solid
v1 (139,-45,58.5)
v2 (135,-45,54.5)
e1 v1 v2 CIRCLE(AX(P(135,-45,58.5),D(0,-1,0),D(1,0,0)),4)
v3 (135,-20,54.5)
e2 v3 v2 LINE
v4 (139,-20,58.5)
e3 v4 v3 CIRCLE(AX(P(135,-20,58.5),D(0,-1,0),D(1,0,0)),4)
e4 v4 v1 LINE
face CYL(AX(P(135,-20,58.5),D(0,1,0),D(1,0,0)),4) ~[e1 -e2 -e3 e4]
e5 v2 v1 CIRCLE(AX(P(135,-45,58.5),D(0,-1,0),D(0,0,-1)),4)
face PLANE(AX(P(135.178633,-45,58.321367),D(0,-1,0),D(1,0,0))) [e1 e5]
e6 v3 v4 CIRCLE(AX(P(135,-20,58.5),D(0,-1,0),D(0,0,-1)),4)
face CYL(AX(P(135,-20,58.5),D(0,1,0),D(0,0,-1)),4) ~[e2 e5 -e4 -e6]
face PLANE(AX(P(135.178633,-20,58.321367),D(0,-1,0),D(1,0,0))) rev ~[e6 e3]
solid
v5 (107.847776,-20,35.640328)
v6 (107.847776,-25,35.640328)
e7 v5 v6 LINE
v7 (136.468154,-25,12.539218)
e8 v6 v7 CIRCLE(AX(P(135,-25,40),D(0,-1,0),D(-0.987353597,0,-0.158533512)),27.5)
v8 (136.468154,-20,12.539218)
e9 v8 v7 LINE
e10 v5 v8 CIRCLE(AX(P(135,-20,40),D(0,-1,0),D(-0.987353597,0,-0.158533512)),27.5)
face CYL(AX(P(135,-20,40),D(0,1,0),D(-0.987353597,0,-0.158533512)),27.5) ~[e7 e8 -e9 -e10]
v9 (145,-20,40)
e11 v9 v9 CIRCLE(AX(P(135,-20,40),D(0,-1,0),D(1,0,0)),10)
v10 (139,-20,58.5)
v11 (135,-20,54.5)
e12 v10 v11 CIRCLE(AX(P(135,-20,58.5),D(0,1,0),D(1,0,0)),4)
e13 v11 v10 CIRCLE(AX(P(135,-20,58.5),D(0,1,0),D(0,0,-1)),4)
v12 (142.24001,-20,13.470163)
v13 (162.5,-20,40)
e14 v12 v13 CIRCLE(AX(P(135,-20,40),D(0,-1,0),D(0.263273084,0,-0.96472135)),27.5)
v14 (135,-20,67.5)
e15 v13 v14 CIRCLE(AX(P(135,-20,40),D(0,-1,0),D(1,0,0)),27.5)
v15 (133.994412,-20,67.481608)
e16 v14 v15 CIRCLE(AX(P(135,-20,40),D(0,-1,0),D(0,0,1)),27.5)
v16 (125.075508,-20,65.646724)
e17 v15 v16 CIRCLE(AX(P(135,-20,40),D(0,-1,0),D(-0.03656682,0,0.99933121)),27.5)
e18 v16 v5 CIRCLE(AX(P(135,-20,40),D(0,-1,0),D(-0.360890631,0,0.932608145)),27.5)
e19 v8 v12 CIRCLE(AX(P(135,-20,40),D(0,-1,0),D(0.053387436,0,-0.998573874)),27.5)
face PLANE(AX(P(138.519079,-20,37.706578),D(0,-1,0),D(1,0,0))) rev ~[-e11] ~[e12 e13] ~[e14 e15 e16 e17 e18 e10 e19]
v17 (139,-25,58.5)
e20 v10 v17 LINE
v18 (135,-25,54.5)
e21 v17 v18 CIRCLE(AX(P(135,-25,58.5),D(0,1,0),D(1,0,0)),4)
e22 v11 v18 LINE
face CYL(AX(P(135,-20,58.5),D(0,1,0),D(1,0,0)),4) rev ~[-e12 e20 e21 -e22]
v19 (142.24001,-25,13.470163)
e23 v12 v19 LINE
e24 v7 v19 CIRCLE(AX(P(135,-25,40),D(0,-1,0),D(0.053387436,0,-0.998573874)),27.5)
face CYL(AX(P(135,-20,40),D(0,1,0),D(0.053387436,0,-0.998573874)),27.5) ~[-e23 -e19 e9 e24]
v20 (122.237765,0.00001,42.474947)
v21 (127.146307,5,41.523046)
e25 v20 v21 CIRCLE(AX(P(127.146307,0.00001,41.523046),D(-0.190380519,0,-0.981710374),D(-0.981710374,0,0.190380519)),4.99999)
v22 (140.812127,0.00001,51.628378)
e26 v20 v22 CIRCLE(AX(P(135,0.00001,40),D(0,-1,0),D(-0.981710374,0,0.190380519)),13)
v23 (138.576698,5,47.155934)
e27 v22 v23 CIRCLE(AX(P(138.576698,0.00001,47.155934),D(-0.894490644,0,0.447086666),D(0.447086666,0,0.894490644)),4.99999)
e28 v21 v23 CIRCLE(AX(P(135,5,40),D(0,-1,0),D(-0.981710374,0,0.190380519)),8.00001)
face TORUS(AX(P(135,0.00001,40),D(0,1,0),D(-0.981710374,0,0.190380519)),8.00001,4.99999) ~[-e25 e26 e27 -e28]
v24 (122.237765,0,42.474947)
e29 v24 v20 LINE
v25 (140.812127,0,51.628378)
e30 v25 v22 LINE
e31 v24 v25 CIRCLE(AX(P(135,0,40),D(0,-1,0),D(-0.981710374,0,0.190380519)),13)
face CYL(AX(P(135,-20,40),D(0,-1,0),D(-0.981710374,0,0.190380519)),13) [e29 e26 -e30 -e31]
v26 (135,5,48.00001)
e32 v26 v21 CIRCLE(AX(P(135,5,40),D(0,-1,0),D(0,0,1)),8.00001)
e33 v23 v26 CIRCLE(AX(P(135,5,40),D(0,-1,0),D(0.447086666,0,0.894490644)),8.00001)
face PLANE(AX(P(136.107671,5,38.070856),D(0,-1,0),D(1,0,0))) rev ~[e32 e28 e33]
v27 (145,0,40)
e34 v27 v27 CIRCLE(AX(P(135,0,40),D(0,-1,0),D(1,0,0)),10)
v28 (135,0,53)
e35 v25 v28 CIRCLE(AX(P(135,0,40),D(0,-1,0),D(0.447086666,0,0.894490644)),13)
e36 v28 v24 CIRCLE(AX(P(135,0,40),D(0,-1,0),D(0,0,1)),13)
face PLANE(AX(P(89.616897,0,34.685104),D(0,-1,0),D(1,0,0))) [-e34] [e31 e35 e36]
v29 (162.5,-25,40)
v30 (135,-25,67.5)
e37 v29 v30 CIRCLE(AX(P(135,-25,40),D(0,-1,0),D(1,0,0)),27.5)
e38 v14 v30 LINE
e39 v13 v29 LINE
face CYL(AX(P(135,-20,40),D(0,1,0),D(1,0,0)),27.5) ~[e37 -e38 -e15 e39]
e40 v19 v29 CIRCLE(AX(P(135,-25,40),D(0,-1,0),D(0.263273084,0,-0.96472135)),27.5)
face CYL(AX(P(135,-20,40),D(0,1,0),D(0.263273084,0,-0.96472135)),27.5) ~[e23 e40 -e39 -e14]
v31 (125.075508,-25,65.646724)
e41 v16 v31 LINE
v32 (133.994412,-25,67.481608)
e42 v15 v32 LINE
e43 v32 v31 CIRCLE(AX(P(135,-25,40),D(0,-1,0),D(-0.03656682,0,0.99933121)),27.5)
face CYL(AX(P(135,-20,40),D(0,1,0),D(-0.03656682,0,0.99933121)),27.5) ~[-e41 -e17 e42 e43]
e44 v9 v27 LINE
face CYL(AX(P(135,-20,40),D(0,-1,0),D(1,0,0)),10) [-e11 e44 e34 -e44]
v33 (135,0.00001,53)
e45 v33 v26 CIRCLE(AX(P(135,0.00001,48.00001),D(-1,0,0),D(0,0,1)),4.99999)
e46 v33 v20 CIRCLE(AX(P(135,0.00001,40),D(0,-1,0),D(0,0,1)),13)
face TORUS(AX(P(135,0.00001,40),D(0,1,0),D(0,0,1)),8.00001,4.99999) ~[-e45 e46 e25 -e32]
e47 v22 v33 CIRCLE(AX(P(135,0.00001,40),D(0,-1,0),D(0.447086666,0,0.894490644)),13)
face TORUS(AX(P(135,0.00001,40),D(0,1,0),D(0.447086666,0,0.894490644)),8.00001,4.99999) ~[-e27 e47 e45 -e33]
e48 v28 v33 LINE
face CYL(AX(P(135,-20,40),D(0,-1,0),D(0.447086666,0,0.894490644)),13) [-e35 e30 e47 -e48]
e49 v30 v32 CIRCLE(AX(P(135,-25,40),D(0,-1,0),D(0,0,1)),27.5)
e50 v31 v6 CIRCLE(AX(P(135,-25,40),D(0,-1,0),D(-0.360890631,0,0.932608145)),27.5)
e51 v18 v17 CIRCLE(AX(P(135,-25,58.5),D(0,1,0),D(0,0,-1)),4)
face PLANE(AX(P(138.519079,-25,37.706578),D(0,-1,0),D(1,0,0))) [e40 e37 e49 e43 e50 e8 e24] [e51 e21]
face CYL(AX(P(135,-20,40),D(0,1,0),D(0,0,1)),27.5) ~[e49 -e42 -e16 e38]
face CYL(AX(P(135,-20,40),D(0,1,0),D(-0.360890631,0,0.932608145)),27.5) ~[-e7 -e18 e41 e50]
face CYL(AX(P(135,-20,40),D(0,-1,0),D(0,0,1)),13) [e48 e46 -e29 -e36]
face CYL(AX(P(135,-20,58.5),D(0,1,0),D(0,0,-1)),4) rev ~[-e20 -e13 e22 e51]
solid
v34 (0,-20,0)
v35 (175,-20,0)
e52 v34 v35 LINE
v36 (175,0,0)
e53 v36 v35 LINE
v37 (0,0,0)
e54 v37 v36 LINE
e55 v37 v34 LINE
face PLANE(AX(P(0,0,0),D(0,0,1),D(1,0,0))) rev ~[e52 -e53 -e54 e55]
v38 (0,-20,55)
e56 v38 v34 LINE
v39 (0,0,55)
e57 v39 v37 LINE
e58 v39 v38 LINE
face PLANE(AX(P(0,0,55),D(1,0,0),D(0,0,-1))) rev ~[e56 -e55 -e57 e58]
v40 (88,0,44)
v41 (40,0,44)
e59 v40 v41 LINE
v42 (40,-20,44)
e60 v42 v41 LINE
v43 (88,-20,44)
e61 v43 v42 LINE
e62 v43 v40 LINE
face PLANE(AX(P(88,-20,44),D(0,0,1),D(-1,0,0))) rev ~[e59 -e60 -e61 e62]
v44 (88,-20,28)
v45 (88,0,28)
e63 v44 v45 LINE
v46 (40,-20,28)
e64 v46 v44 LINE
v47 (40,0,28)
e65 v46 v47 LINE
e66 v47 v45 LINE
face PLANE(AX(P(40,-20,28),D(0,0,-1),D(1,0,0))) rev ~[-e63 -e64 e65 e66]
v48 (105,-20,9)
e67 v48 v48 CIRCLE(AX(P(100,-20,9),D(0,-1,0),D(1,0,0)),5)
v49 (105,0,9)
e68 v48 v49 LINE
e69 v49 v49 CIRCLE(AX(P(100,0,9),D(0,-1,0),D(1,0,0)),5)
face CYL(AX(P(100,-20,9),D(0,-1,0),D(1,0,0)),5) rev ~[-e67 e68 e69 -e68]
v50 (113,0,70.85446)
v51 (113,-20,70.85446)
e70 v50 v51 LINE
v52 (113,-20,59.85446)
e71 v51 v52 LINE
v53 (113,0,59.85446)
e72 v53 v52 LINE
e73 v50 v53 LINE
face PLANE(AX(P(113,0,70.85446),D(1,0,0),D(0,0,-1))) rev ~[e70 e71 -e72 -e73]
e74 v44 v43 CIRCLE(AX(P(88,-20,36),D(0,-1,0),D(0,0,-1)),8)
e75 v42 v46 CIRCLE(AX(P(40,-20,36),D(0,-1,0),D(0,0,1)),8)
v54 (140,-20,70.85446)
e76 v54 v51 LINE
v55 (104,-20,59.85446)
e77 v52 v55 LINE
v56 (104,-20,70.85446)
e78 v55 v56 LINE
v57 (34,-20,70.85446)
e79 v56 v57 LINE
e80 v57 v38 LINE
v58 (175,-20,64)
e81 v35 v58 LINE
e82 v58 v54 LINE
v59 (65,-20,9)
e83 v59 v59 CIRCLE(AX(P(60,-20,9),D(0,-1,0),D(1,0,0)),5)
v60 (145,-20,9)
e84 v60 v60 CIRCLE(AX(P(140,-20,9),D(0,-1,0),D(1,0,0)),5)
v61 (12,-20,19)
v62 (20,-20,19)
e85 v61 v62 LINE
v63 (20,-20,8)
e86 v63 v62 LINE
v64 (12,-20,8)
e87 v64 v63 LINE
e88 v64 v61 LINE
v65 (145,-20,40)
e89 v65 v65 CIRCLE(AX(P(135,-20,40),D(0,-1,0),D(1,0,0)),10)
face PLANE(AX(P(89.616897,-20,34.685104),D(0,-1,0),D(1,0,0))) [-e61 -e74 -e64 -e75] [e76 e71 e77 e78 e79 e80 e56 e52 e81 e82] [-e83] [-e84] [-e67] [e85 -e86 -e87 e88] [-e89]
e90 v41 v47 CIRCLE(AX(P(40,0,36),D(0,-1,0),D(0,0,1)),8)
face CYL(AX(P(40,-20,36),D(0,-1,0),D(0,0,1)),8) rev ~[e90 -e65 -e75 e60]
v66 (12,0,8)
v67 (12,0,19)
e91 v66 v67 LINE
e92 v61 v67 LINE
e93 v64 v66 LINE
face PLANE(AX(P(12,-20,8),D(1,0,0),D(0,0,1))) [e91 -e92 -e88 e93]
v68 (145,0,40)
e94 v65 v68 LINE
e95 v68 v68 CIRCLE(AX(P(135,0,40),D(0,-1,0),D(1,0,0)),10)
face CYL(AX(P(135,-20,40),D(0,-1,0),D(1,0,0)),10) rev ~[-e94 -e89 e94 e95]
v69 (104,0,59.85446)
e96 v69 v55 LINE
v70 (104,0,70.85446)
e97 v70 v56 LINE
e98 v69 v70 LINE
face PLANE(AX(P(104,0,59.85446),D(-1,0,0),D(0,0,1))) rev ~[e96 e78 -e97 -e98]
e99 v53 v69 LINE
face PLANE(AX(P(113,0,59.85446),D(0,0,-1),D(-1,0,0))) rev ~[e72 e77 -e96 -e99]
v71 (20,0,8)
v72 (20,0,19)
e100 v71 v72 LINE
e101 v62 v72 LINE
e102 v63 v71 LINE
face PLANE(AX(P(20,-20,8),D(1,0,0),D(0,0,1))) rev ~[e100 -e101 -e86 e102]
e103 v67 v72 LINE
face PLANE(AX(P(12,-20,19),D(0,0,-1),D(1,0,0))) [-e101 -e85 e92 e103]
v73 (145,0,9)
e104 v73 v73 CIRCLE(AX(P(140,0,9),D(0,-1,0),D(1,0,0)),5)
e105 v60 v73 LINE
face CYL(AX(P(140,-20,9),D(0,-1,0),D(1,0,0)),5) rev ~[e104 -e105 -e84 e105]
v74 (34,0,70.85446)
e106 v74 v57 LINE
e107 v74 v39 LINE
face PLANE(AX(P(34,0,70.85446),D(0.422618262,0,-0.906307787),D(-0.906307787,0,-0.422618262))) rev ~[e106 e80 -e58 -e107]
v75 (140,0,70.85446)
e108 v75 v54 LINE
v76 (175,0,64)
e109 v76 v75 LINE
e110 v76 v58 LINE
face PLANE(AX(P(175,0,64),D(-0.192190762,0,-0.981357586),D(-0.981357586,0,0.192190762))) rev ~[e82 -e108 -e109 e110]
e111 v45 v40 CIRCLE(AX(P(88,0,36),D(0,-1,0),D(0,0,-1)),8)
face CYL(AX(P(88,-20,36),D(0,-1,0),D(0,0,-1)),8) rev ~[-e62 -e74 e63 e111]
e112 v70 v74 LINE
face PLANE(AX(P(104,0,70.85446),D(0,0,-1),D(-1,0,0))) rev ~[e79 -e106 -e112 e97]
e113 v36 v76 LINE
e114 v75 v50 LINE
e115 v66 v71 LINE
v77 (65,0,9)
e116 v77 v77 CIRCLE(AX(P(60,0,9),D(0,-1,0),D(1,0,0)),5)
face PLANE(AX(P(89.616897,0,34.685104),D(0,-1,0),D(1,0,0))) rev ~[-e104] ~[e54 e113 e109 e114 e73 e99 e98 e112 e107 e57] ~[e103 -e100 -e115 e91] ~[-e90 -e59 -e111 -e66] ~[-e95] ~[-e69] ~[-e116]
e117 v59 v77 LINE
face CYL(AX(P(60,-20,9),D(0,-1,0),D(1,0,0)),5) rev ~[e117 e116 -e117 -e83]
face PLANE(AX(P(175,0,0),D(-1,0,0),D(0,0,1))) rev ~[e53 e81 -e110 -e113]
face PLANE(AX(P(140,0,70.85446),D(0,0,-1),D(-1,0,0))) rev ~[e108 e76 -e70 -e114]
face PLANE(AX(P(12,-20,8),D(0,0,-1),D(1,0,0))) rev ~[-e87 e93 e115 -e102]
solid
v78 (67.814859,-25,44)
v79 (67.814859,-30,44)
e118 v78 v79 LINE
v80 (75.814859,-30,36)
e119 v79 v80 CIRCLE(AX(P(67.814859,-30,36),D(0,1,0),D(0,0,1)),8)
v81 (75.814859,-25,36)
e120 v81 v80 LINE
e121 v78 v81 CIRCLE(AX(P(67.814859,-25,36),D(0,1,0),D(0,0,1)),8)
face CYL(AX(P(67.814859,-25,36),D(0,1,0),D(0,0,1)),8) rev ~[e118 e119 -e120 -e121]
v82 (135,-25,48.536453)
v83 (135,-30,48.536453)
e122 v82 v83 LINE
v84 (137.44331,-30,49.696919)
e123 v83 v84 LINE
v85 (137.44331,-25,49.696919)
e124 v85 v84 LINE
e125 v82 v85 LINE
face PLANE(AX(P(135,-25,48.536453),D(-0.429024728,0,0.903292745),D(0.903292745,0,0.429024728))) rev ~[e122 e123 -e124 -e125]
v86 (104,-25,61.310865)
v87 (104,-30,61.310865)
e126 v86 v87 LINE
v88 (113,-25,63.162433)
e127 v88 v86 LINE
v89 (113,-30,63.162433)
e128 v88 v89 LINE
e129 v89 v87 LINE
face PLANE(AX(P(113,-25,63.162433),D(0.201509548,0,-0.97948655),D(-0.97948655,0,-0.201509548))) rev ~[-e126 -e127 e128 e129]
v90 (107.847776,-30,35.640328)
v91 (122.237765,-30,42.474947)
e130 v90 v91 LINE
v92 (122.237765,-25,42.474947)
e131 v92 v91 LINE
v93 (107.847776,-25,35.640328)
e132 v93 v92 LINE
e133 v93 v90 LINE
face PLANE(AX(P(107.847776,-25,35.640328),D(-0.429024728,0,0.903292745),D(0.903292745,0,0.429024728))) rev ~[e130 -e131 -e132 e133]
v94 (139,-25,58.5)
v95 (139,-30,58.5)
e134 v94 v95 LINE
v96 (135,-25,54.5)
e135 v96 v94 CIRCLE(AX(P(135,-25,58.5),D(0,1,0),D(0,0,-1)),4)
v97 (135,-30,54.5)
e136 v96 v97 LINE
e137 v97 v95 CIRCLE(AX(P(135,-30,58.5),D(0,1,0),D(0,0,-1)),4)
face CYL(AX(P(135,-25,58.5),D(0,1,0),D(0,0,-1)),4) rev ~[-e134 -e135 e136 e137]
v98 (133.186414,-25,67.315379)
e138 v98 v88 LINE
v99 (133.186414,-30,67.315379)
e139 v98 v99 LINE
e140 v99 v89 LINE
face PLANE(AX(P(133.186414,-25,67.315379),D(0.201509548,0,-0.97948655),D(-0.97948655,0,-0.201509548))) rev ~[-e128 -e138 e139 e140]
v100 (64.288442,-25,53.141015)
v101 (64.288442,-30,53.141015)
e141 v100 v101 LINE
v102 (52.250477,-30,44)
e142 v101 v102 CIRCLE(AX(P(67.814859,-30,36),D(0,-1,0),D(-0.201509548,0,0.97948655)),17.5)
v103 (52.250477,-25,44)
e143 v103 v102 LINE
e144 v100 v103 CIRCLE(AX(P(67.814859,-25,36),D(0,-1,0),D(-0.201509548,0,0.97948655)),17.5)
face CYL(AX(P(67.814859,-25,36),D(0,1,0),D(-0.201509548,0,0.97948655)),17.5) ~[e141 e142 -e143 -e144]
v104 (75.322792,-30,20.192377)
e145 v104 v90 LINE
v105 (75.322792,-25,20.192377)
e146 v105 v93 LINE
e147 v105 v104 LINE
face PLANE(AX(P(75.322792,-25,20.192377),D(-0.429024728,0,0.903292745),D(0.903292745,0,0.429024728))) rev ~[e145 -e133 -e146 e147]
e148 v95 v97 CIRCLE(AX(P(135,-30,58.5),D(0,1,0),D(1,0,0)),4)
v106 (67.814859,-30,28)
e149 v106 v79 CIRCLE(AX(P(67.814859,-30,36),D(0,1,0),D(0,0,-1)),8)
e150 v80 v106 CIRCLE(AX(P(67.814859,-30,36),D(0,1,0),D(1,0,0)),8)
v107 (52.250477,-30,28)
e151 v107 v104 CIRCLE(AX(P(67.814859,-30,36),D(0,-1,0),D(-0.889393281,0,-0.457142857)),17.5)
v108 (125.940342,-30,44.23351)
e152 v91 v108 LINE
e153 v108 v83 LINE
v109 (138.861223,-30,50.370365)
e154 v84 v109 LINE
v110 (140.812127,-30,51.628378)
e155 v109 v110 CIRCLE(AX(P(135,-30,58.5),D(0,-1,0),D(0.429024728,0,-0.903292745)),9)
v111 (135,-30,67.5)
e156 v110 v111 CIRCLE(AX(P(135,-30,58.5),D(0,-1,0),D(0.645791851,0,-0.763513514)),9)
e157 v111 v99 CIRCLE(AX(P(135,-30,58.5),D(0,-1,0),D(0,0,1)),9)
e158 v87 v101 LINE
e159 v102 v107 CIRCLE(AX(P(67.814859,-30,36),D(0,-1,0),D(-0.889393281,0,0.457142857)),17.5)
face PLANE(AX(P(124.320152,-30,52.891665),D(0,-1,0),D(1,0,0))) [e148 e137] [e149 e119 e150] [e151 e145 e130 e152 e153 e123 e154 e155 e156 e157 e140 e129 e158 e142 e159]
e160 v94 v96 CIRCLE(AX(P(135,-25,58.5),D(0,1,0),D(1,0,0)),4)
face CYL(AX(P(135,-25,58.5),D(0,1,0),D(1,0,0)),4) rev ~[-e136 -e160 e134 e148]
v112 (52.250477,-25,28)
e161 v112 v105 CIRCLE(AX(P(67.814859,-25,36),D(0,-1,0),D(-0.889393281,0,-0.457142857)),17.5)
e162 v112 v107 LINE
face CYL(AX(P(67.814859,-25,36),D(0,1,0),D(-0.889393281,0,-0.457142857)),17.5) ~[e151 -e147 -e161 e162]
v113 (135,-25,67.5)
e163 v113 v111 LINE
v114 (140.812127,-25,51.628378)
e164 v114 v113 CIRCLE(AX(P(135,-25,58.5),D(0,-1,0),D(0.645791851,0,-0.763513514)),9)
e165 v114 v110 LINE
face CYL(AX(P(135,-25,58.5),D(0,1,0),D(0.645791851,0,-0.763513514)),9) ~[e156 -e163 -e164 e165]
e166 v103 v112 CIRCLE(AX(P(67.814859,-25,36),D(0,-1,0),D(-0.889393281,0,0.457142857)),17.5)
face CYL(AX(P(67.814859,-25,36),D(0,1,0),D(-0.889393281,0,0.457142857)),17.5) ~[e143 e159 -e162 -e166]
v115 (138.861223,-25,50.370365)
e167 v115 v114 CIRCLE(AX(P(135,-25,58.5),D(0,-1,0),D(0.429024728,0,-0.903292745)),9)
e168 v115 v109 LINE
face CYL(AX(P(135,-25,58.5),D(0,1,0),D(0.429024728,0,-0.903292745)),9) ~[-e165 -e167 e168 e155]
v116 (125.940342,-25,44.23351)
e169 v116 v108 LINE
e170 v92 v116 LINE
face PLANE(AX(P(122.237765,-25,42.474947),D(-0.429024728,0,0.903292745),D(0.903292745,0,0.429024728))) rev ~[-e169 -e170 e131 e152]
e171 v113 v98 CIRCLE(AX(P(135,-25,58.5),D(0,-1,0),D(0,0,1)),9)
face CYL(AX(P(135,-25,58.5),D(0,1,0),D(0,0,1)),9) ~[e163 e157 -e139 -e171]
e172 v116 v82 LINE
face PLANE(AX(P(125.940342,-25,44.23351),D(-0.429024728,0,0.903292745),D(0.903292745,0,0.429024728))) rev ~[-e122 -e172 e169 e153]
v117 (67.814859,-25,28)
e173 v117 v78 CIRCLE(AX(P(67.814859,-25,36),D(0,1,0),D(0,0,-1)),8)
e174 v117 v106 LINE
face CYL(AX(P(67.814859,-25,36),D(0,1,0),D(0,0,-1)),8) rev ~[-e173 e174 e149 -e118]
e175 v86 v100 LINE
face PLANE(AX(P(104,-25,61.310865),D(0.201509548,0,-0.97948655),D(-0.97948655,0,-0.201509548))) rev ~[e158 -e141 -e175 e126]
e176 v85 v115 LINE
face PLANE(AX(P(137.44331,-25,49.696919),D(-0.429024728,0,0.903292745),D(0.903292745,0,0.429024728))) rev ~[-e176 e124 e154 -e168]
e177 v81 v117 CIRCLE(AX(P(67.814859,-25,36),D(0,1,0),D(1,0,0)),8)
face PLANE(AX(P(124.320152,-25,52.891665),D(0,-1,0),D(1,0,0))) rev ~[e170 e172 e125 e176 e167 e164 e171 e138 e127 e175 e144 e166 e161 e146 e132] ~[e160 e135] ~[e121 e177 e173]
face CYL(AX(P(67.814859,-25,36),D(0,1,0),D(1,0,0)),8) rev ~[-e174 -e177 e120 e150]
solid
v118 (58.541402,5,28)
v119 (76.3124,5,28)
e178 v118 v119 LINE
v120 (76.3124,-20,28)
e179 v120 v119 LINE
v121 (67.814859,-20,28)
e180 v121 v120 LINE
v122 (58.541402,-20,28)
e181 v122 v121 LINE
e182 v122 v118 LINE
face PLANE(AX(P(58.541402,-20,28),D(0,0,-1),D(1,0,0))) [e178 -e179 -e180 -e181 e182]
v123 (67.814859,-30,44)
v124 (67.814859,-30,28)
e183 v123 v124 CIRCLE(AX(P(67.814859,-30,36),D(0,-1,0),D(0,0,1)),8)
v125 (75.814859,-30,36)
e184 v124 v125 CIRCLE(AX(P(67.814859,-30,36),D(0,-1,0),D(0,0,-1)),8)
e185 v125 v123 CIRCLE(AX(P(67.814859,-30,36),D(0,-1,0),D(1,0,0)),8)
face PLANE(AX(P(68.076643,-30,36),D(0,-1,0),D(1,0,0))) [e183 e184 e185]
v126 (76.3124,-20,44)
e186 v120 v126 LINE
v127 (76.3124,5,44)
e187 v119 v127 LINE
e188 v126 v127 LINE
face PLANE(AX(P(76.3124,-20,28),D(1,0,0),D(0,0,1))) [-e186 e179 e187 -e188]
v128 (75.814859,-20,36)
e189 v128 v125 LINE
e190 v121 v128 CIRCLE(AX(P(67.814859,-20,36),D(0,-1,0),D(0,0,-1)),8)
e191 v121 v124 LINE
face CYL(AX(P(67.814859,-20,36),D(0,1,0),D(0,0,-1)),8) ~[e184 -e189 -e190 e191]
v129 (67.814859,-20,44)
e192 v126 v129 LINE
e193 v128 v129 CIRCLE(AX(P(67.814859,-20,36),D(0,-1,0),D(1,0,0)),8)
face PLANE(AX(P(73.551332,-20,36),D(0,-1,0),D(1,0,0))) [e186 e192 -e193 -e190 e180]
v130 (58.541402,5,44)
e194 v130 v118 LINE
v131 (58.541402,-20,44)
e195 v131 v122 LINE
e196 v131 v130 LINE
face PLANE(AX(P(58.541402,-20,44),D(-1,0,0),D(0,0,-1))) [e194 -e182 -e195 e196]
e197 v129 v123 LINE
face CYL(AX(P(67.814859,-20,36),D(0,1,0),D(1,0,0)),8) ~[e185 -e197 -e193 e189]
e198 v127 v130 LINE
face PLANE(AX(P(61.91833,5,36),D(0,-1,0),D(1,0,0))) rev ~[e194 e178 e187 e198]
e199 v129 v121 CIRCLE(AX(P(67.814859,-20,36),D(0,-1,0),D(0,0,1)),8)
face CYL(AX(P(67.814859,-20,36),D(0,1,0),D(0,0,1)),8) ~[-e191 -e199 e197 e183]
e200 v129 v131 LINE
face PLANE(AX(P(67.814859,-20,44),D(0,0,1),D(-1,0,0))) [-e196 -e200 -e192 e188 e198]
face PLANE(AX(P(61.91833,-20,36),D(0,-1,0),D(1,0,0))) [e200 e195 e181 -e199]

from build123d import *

# Parameters (mm, degrees)
F1_DEPTH       = 20
F2_W           = 8
F2_H           = 11
F2_R           = 5
F2_R_2         = 10
F3_DEPTH       = 20
F5_DEPTH       = 5
F5_DEPTH_BACK  = 25
F7_R           = 4.99999
F8_DEPTH       = 5
F9_DEPTH       = 25
F10_START      = 5
F10_DEPTH      = 5
F11_DEPTH      = 25
F11_DEPTH_BACK = 10
F12_DEPTH      = 25


# Not quite as in the source:
# - a fillet or chamfer is up to 0.001 mm smaller than in the source, because OpenCascade refuses the exact size


with BuildPart() as f1:
    # F0 (on Front) → F1 (new body)
    with BuildSketch(Plane.XZ):
        Polygon((0, 55), (0, 0), (175, 0), (175, 64), (140, 70.8544603773), (113, 70.8544603773), (113, 59.8544603773), (104, 59.8544603773), (104, 70.8544603773), (34, 70.8544603773), align=None)
    extrude(amount=F1_DEPTH)

    # F2 (on face) → F3 (cut, through all)
    with BuildSketch(Plane.XZ.offset(20)):
        with Locations((16, 13.5)):
            Rectangle(F2_W, F2_H)
        with Locations((60, 9)):
            Circle(F2_R)
        with BuildLine():
            Line((88, 44), (40, 44))
            ThreePointArc((40, 44), (32, 36), (40, 28))
            Line((40, 28), (88, 28))
            ThreePointArc((88, 28), (96, 36), (88, 44))
        make_face()
        with Locations((135, 40)):
            Circle(F2_R_2)
        with Locations((100, 9)):
            Circle(F2_R)
        with Locations((140, 9)):
            Circle(F2_R)
    extrude(amount=-F3_DEPTH, mode=Mode.SUBTRACT)


with BuildPart() as f5:
    # F4 (on face) → F5 (new body, two sides)
    with BuildSketch(Plane.XZ.offset(20)) as f5_sk:
        with BuildLine():
            ThreePointArc((148, 40), (146.0579755506, 46.8352890738), (140.8121266581, 51.6283783784))
            ThreePointArc((140.8121266581, 51.6283783784), (139.8774040705, 50.9362093146), (138.8612225529, 50.3703652975))
            Line((138.8612225529, 50.3703652975), (137.4433104674, 49.6969187869))
            ThreePointArc((137.4433104674, 49.6969187869), (142.8877469747, 46.1468241933), (145, 40))
            ThreePointArc((145, 40), (132.8316568043, 30.2379158073), (125.9403424429, 44.2335097671))
            Line((125.9403424429, 44.2335097671), (122.2377651401, 42.4749467432))
            ThreePointArc((122.2377651401, 42.4749467432), (133.7568292913, 27.0595778048), (148, 40))
        make_face()
        with BuildLine():
            ThreePointArc((138.8612225529, 50.3703652975), (139.8774040705, 50.9362093146), (140.8121266581, 51.6283783784))
            ThreePointArc((140.8121266581, 51.6283783784), (137.9858902425, 52.6524487535), (135, 53))
            Line((135, 53), (135, 50))
            ThreePointArc((135, 50), (136.2310183043, 49.9239404439), (137.4433104674, 49.6969187869))
            Line((137.4433104674, 49.6969187869), (138.8612225529, 50.3703652975))
        make_face()
        with BuildLine():
            Line((135, 50), (135, 53))
            ThreePointArc((135, 53), (126.7287941527, 50.0293147239), (122.2377651401, 42.4749467432))
            Line((122.2377651401, 42.4749467432), (125.9403424429, 44.2335097671))
            ThreePointArc((125.9403424429, 44.2335097671), (129.6304142465, 48.4360861088), (135, 50))
        make_face()
        with BuildLine():
            Line((135, 48.5364526865), (135, 50))
            ThreePointArc((135, 50), (129.6304142465, 48.4360861088), (125.9403424429, 44.2335097671))
            Line((125.9403424429, 44.2335097671), (135, 48.5364526865))
        make_face()
        with BuildLine():
            ThreePointArc((145, 40), (142.8877469747, 46.1468241933), (137.4433104674, 49.6969187869))
            Line((137.4433104674, 49.6969187869), (135, 48.5364526865))
            Line((135, 48.5364526865), (125.9403424429, 44.2335097671))
            ThreePointArc((125.9403424429, 44.2335097671), (132.8316568043, 30.2379158073), (145, 40))
        make_face()
        with BuildLine():
            Line((135, 48.5364526865), (137.4433104674, 49.6969187869))
            ThreePointArc((137.4433104674, 49.6969187869), (136.2310183043, 49.9239404439), (135, 50))
            Line((135, 50), (135, 48.5364526865))
        make_face()
    extrude(amount=F5_DEPTH)
    extrude(f5_sk.sketch, amount=-F5_DEPTH_BACK)

    # F6: cut F1
    add(f1.part, mode=Mode.SUBTRACT)

    # F7 (radius 5 in the source; OpenCascade refuses exactly that, so slightly less here)
    f7_edges = [f5.edges().sort_by_distance(p)[0] for p in [
        (135, 5, 27),
    ]]
    fillet(f7_edges, radius=F7_R)

    # F4 (on face) → F8 (join)
    with BuildSketch(Plane.XZ.offset(20)):
        with BuildLine():
            ThreePointArc((142.2400098005, 13.470162871), (156.8557803511, 23.3094378392), (162.5, 40))
            ThreePointArc((162.5, 40), (154.4454364826, 59.4454364826), (135, 67.5))
            ThreePointArc((135, 67.5), (143.4511713565, 61.5947863743), (140.8121266581, 51.6283783784))
            ThreePointArc((140.8121266581, 51.6283783784), (146.0579755506, 46.8352890738), (148, 40))
            ThreePointArc((148, 40), (133.7568292913, 27.0595778048), (122.2377651401, 42.4749467432))
            Line((122.2377651401, 42.4749467432), (107.8477760814, 35.6403284212))
            ThreePointArc((107.8477760814, 35.6403284212), (117.7276760177, 18.601008803), (136.4681544997, 12.5392184677))
            ThreePointArc((136.4681544997, 12.5392184677), (139.2038378059, 13.9362056036), (142.2400098005, 13.470162871))
        make_face()
        with BuildLine():
            ThreePointArc((140.8121266581, 51.6283783784), (143.4511713565, 61.5947863743), (135, 67.5))
            ThreePointArc((135, 67.5), (134.0885205875, 67.4537257765), (133.1864140644, 67.3153789513))
            Line((133.1864140644, 67.3153789513), (125.0755076463, 65.646723992))
            ThreePointArc((125.0755076463, 65.646723992), (111.1511705492, 53.6924553615), (107.8477760814, 35.6403284212))
            Line((107.8477760814, 35.6403284212), (122.2377651401, 42.4749467432))
            ThreePointArc((122.2377651401, 42.4749467432), (126.7287941527, 50.0293147239), (135, 53))
            ThreePointArc((135, 53), (137.9858902425, 52.6524487535), (140.8121266581, 51.6283783784))
        make_face()
        with BuildLine():
            ThreePointArc((139, 58.5), (137.8284271247, 55.6715728753), (135, 54.5))
            ThreePointArc((135, 54.5), (132.1715728753, 61.3284271247), (139, 58.5))
        make_face(mode=Mode.SUBTRACT)
        with BuildLine():
            Line((133.1864140644, 67.3153789513), (133.9944124644, 67.481608281))
            ThreePointArc((133.9944124644, 67.481608281), (129.458487419, 66.9358801288), (125.0755076463, 65.646723992))
            Line((125.0755076463, 65.646723992), (133.1864140644, 67.3153789513))
        make_face()
        with BuildLine():
            ThreePointArc((133.1864140644, 67.3153789513), (134.0885205875, 67.4537257765), (135, 67.5))
            ThreePointArc((135, 67.5), (134.4971221453, 67.4954016858), (133.9944124644, 67.481608281))
            Line((133.9944124644, 67.481608281), (133.1864140644, 67.3153789513))
        make_face()
        with BuildLine():
            ThreePointArc((136.4681544997, 12.5392184677), (139.3788920677, 12.8508691804), (142.2400098005, 13.470162871))
            ThreePointArc((142.2400098005, 13.470162871), (139.2038378059, 13.9362056036), (136.4681544997, 12.5392184677))
        make_face()
    extrude(amount=F8_DEPTH)


with BuildPart() as f9:
    # F4 (on face) → F9 (new body)
    with BuildSketch(Plane.XZ.offset(20)):
        with BuildLine():
            ThreePointArc((139, 58.5), (132.1715728753, 61.3284271247), (135, 54.5))
            ThreePointArc((135, 54.5), (137.8284271247, 55.6715728753), (139, 58.5))
        make_face()
    extrude(amount=F9_DEPTH)


with BuildPart() as f10:
    # F4 (on face) → F10 (new body)
    with BuildSketch(Plane.XZ.offset(20).offset(F10_START)):
        with BuildLine():
            ThreePointArc((140.8121266581, 51.6283783784), (143.4511713565, 61.5947863743), (135, 67.5))
            ThreePointArc((135, 67.5), (134.0885205875, 67.4537257765), (133.1864140644, 67.3153789513))
            Line((133.1864140644, 67.3153789513), (125.0755076463, 65.646723992))
            ThreePointArc((125.0755076463, 65.646723992), (111.1511705492, 53.6924553615), (107.8477760814, 35.6403284212))
            Line((107.8477760814, 35.6403284212), (122.2377651401, 42.4749467432))
            ThreePointArc((122.2377651401, 42.4749467432), (126.7287941527, 50.0293147239), (135, 53))
            ThreePointArc((135, 53), (137.9858902425, 52.6524487535), (140.8121266581, 51.6283783784))
        make_face()
        with BuildLine():
            ThreePointArc((139, 58.5), (137.8284271247, 55.6715728753), (135, 54.5))
            ThreePointArc((135, 54.5), (132.1715728753, 61.3284271247), (139, 58.5))
        make_face(mode=Mode.SUBTRACT)
        with BuildLine():
            ThreePointArc((138.8612225529, 50.3703652975), (139.8774040705, 50.9362093146), (140.8121266581, 51.6283783784))
            ThreePointArc((140.8121266581, 51.6283783784), (137.9858902425, 52.6524487535), (135, 53))
            Line((135, 53), (135, 50))
            ThreePointArc((135, 50), (136.2310183043, 49.9239404439), (137.4433104674, 49.6969187869))
            Line((137.4433104674, 49.6969187869), (138.8612225529, 50.3703652975))
        make_face()
        with BuildLine():
            ThreePointArc((107.8477760814, 35.6403284212), (111.1511705492, 53.6924553615), (125.0755076463, 65.646723992))
            Line((125.0755076463, 65.646723992), (113, 63.1624325107))
            Line((113, 63.1624325107), (113, 59.8544603773))
            Line((113, 59.8544603773), (104, 59.8544603773))
            Line((104, 59.8544603773), (104, 61.3108645282))
            Line((104, 61.3108645282), (64.2884421212, 53.1410146274))
            ThreePointArc((64.2884421212, 53.1410146274), (57.231655846, 49.9372094187), (52.2504768019, 44))
            Line((52.2504768019, 44), (58.5414022207, 44))
            Line((58.5414022207, 44), (67.8148592182, 44))
            Line((67.8148592182, 44), (76.3124004006, 44))
            Line((76.3124004006, 44), (88, 44))
            ThreePointArc((88, 44), (96, 36), (88, 28))
            Line((88, 28), (76.3124004006, 28))
            Line((76.3124004006, 28), (67.8148592182, 28))
            Line((67.8148592182, 28), (58.5414022207, 28))
            Line((58.5414022207, 28), (52.2504768019, 28))
            ThreePointArc((52.2504768019, 28), (62.2053726379, 19.4234002188), (75.32279196, 20.1923769673))
            Line((75.32279196, 20.1923769673), (107.8477760814, 35.6403284212))
        make_face()
        with BuildLine():
            Line((135, 50), (135, 53))
            ThreePointArc((135, 53), (126.7287941527, 50.0293147239), (122.2377651401, 42.4749467432))
            Line((122.2377651401, 42.4749467432), (125.9403424429, 44.2335097671))
            ThreePointArc((125.9403424429, 44.2335097671), (129.6304142465, 48.4360861088), (135, 50))
        make_face()
        Polygon((113, 59.8544603773), (113, 63.1624325107), (104, 61.3108645282), (104, 59.8544603773), align=None)
        with BuildLine():
            Line((135, 48.5364526865), (137.4433104674, 49.6969187869))
            ThreePointArc((137.4433104674, 49.6969187869), (136.2310183043, 49.9239404439), (135, 50))
            Line((135, 50), (135, 48.5364526865))
        make_face()
        with BuildLine():
            Line((135, 48.5364526865), (135, 50))
            ThreePointArc((135, 50), (129.6304142465, 48.4360861088), (125.9403424429, 44.2335097671))
            Line((125.9403424429, 44.2335097671), (135, 48.5364526865))
        make_face()
        with BuildLine():
            ThreePointArc((52.2504768019, 44), (50.3148592182, 36), (52.2504768019, 28))
            Line((52.2504768019, 28), (58.5414022207, 28))
            Line((58.5414022207, 28), (58.5414022207, 44))
            Line((58.5414022207, 44), (52.2504768019, 44))
        make_face()
        with BuildLine():
            Line((58.5414022207, 44), (58.5414022207, 28))
            Line((58.5414022207, 28), (67.8148592182, 28))
            ThreePointArc((67.8148592182, 28), (59.8148592182, 36), (67.8148592182, 44))
            Line((67.8148592182, 44), (58.5414022207, 44))
        make_face()
        with BuildLine():
            ThreePointArc((75.8148592182, 36), (73.4717134677, 30.3431457505), (67.8148592182, 28))
            Line((67.8148592182, 28), (76.3124004006, 28))
            Line((76.3124004006, 28), (76.3124004006, 44))
            Line((76.3124004006, 44), (67.8148592182, 44))
            ThreePointArc((67.8148592182, 44), (73.4717134677, 41.6568542495), (75.8148592182, 36))
        make_face()
        with BuildLine():
            Line((76.3124004006, 44), (76.3124004006, 28))
            Line((76.3124004006, 28), (88, 28))
            ThreePointArc((88, 28), (96, 36), (88, 44))
            Line((88, 44), (76.3124004006, 44))
        make_face()
    extrude(amount=F10_DEPTH)


with BuildPart() as f11:
    # F4 (on face) → F11 (new body, two sides)
    with BuildSketch(Plane.XZ.offset(20)) as f11_sk:
        with BuildLine():
            ThreePointArc((67.8148592182, 44), (59.8148592182, 36), (67.8148592182, 28))
            ThreePointArc((67.8148592182, 28), (73.4717134677, 30.3431457505), (75.8148592182, 36))
            ThreePointArc((75.8148592182, 36), (73.4717134677, 41.6568542495), (67.8148592182, 44))
        make_face()
    extrude(amount=-F11_DEPTH)
    extrude(f11_sk.sketch, amount=F11_DEPTH_BACK)

    # F4 (on face) → F12 (join)
    with BuildSketch(Plane.XZ.offset(20)):
        with BuildLine():
            Line((58.5414022207, 44), (58.5414022207, 28))
            Line((58.5414022207, 28), (67.8148592182, 28))
            ThreePointArc((67.8148592182, 28), (59.8148592182, 36), (67.8148592182, 44))
            Line((67.8148592182, 44), (58.5414022207, 44))
        make_face()
        with BuildLine():
            ThreePointArc((75.8148592182, 36), (73.4717134677, 30.3431457505), (67.8148592182, 28))
            Line((67.8148592182, 28), (76.3124004006, 28))
            Line((76.3124004006, 28), (76.3124004006, 44))
            Line((76.3124004006, 44), (67.8148592182, 44))
            ThreePointArc((67.8148592182, 44), (73.4717134677, 41.6568542495), (75.8148592182, 36))
        make_face()
    extrude(amount=-F12_DEPTH)


solid = Compound([f1.part, f5.part, f9.part, f10.part, f11.part])
